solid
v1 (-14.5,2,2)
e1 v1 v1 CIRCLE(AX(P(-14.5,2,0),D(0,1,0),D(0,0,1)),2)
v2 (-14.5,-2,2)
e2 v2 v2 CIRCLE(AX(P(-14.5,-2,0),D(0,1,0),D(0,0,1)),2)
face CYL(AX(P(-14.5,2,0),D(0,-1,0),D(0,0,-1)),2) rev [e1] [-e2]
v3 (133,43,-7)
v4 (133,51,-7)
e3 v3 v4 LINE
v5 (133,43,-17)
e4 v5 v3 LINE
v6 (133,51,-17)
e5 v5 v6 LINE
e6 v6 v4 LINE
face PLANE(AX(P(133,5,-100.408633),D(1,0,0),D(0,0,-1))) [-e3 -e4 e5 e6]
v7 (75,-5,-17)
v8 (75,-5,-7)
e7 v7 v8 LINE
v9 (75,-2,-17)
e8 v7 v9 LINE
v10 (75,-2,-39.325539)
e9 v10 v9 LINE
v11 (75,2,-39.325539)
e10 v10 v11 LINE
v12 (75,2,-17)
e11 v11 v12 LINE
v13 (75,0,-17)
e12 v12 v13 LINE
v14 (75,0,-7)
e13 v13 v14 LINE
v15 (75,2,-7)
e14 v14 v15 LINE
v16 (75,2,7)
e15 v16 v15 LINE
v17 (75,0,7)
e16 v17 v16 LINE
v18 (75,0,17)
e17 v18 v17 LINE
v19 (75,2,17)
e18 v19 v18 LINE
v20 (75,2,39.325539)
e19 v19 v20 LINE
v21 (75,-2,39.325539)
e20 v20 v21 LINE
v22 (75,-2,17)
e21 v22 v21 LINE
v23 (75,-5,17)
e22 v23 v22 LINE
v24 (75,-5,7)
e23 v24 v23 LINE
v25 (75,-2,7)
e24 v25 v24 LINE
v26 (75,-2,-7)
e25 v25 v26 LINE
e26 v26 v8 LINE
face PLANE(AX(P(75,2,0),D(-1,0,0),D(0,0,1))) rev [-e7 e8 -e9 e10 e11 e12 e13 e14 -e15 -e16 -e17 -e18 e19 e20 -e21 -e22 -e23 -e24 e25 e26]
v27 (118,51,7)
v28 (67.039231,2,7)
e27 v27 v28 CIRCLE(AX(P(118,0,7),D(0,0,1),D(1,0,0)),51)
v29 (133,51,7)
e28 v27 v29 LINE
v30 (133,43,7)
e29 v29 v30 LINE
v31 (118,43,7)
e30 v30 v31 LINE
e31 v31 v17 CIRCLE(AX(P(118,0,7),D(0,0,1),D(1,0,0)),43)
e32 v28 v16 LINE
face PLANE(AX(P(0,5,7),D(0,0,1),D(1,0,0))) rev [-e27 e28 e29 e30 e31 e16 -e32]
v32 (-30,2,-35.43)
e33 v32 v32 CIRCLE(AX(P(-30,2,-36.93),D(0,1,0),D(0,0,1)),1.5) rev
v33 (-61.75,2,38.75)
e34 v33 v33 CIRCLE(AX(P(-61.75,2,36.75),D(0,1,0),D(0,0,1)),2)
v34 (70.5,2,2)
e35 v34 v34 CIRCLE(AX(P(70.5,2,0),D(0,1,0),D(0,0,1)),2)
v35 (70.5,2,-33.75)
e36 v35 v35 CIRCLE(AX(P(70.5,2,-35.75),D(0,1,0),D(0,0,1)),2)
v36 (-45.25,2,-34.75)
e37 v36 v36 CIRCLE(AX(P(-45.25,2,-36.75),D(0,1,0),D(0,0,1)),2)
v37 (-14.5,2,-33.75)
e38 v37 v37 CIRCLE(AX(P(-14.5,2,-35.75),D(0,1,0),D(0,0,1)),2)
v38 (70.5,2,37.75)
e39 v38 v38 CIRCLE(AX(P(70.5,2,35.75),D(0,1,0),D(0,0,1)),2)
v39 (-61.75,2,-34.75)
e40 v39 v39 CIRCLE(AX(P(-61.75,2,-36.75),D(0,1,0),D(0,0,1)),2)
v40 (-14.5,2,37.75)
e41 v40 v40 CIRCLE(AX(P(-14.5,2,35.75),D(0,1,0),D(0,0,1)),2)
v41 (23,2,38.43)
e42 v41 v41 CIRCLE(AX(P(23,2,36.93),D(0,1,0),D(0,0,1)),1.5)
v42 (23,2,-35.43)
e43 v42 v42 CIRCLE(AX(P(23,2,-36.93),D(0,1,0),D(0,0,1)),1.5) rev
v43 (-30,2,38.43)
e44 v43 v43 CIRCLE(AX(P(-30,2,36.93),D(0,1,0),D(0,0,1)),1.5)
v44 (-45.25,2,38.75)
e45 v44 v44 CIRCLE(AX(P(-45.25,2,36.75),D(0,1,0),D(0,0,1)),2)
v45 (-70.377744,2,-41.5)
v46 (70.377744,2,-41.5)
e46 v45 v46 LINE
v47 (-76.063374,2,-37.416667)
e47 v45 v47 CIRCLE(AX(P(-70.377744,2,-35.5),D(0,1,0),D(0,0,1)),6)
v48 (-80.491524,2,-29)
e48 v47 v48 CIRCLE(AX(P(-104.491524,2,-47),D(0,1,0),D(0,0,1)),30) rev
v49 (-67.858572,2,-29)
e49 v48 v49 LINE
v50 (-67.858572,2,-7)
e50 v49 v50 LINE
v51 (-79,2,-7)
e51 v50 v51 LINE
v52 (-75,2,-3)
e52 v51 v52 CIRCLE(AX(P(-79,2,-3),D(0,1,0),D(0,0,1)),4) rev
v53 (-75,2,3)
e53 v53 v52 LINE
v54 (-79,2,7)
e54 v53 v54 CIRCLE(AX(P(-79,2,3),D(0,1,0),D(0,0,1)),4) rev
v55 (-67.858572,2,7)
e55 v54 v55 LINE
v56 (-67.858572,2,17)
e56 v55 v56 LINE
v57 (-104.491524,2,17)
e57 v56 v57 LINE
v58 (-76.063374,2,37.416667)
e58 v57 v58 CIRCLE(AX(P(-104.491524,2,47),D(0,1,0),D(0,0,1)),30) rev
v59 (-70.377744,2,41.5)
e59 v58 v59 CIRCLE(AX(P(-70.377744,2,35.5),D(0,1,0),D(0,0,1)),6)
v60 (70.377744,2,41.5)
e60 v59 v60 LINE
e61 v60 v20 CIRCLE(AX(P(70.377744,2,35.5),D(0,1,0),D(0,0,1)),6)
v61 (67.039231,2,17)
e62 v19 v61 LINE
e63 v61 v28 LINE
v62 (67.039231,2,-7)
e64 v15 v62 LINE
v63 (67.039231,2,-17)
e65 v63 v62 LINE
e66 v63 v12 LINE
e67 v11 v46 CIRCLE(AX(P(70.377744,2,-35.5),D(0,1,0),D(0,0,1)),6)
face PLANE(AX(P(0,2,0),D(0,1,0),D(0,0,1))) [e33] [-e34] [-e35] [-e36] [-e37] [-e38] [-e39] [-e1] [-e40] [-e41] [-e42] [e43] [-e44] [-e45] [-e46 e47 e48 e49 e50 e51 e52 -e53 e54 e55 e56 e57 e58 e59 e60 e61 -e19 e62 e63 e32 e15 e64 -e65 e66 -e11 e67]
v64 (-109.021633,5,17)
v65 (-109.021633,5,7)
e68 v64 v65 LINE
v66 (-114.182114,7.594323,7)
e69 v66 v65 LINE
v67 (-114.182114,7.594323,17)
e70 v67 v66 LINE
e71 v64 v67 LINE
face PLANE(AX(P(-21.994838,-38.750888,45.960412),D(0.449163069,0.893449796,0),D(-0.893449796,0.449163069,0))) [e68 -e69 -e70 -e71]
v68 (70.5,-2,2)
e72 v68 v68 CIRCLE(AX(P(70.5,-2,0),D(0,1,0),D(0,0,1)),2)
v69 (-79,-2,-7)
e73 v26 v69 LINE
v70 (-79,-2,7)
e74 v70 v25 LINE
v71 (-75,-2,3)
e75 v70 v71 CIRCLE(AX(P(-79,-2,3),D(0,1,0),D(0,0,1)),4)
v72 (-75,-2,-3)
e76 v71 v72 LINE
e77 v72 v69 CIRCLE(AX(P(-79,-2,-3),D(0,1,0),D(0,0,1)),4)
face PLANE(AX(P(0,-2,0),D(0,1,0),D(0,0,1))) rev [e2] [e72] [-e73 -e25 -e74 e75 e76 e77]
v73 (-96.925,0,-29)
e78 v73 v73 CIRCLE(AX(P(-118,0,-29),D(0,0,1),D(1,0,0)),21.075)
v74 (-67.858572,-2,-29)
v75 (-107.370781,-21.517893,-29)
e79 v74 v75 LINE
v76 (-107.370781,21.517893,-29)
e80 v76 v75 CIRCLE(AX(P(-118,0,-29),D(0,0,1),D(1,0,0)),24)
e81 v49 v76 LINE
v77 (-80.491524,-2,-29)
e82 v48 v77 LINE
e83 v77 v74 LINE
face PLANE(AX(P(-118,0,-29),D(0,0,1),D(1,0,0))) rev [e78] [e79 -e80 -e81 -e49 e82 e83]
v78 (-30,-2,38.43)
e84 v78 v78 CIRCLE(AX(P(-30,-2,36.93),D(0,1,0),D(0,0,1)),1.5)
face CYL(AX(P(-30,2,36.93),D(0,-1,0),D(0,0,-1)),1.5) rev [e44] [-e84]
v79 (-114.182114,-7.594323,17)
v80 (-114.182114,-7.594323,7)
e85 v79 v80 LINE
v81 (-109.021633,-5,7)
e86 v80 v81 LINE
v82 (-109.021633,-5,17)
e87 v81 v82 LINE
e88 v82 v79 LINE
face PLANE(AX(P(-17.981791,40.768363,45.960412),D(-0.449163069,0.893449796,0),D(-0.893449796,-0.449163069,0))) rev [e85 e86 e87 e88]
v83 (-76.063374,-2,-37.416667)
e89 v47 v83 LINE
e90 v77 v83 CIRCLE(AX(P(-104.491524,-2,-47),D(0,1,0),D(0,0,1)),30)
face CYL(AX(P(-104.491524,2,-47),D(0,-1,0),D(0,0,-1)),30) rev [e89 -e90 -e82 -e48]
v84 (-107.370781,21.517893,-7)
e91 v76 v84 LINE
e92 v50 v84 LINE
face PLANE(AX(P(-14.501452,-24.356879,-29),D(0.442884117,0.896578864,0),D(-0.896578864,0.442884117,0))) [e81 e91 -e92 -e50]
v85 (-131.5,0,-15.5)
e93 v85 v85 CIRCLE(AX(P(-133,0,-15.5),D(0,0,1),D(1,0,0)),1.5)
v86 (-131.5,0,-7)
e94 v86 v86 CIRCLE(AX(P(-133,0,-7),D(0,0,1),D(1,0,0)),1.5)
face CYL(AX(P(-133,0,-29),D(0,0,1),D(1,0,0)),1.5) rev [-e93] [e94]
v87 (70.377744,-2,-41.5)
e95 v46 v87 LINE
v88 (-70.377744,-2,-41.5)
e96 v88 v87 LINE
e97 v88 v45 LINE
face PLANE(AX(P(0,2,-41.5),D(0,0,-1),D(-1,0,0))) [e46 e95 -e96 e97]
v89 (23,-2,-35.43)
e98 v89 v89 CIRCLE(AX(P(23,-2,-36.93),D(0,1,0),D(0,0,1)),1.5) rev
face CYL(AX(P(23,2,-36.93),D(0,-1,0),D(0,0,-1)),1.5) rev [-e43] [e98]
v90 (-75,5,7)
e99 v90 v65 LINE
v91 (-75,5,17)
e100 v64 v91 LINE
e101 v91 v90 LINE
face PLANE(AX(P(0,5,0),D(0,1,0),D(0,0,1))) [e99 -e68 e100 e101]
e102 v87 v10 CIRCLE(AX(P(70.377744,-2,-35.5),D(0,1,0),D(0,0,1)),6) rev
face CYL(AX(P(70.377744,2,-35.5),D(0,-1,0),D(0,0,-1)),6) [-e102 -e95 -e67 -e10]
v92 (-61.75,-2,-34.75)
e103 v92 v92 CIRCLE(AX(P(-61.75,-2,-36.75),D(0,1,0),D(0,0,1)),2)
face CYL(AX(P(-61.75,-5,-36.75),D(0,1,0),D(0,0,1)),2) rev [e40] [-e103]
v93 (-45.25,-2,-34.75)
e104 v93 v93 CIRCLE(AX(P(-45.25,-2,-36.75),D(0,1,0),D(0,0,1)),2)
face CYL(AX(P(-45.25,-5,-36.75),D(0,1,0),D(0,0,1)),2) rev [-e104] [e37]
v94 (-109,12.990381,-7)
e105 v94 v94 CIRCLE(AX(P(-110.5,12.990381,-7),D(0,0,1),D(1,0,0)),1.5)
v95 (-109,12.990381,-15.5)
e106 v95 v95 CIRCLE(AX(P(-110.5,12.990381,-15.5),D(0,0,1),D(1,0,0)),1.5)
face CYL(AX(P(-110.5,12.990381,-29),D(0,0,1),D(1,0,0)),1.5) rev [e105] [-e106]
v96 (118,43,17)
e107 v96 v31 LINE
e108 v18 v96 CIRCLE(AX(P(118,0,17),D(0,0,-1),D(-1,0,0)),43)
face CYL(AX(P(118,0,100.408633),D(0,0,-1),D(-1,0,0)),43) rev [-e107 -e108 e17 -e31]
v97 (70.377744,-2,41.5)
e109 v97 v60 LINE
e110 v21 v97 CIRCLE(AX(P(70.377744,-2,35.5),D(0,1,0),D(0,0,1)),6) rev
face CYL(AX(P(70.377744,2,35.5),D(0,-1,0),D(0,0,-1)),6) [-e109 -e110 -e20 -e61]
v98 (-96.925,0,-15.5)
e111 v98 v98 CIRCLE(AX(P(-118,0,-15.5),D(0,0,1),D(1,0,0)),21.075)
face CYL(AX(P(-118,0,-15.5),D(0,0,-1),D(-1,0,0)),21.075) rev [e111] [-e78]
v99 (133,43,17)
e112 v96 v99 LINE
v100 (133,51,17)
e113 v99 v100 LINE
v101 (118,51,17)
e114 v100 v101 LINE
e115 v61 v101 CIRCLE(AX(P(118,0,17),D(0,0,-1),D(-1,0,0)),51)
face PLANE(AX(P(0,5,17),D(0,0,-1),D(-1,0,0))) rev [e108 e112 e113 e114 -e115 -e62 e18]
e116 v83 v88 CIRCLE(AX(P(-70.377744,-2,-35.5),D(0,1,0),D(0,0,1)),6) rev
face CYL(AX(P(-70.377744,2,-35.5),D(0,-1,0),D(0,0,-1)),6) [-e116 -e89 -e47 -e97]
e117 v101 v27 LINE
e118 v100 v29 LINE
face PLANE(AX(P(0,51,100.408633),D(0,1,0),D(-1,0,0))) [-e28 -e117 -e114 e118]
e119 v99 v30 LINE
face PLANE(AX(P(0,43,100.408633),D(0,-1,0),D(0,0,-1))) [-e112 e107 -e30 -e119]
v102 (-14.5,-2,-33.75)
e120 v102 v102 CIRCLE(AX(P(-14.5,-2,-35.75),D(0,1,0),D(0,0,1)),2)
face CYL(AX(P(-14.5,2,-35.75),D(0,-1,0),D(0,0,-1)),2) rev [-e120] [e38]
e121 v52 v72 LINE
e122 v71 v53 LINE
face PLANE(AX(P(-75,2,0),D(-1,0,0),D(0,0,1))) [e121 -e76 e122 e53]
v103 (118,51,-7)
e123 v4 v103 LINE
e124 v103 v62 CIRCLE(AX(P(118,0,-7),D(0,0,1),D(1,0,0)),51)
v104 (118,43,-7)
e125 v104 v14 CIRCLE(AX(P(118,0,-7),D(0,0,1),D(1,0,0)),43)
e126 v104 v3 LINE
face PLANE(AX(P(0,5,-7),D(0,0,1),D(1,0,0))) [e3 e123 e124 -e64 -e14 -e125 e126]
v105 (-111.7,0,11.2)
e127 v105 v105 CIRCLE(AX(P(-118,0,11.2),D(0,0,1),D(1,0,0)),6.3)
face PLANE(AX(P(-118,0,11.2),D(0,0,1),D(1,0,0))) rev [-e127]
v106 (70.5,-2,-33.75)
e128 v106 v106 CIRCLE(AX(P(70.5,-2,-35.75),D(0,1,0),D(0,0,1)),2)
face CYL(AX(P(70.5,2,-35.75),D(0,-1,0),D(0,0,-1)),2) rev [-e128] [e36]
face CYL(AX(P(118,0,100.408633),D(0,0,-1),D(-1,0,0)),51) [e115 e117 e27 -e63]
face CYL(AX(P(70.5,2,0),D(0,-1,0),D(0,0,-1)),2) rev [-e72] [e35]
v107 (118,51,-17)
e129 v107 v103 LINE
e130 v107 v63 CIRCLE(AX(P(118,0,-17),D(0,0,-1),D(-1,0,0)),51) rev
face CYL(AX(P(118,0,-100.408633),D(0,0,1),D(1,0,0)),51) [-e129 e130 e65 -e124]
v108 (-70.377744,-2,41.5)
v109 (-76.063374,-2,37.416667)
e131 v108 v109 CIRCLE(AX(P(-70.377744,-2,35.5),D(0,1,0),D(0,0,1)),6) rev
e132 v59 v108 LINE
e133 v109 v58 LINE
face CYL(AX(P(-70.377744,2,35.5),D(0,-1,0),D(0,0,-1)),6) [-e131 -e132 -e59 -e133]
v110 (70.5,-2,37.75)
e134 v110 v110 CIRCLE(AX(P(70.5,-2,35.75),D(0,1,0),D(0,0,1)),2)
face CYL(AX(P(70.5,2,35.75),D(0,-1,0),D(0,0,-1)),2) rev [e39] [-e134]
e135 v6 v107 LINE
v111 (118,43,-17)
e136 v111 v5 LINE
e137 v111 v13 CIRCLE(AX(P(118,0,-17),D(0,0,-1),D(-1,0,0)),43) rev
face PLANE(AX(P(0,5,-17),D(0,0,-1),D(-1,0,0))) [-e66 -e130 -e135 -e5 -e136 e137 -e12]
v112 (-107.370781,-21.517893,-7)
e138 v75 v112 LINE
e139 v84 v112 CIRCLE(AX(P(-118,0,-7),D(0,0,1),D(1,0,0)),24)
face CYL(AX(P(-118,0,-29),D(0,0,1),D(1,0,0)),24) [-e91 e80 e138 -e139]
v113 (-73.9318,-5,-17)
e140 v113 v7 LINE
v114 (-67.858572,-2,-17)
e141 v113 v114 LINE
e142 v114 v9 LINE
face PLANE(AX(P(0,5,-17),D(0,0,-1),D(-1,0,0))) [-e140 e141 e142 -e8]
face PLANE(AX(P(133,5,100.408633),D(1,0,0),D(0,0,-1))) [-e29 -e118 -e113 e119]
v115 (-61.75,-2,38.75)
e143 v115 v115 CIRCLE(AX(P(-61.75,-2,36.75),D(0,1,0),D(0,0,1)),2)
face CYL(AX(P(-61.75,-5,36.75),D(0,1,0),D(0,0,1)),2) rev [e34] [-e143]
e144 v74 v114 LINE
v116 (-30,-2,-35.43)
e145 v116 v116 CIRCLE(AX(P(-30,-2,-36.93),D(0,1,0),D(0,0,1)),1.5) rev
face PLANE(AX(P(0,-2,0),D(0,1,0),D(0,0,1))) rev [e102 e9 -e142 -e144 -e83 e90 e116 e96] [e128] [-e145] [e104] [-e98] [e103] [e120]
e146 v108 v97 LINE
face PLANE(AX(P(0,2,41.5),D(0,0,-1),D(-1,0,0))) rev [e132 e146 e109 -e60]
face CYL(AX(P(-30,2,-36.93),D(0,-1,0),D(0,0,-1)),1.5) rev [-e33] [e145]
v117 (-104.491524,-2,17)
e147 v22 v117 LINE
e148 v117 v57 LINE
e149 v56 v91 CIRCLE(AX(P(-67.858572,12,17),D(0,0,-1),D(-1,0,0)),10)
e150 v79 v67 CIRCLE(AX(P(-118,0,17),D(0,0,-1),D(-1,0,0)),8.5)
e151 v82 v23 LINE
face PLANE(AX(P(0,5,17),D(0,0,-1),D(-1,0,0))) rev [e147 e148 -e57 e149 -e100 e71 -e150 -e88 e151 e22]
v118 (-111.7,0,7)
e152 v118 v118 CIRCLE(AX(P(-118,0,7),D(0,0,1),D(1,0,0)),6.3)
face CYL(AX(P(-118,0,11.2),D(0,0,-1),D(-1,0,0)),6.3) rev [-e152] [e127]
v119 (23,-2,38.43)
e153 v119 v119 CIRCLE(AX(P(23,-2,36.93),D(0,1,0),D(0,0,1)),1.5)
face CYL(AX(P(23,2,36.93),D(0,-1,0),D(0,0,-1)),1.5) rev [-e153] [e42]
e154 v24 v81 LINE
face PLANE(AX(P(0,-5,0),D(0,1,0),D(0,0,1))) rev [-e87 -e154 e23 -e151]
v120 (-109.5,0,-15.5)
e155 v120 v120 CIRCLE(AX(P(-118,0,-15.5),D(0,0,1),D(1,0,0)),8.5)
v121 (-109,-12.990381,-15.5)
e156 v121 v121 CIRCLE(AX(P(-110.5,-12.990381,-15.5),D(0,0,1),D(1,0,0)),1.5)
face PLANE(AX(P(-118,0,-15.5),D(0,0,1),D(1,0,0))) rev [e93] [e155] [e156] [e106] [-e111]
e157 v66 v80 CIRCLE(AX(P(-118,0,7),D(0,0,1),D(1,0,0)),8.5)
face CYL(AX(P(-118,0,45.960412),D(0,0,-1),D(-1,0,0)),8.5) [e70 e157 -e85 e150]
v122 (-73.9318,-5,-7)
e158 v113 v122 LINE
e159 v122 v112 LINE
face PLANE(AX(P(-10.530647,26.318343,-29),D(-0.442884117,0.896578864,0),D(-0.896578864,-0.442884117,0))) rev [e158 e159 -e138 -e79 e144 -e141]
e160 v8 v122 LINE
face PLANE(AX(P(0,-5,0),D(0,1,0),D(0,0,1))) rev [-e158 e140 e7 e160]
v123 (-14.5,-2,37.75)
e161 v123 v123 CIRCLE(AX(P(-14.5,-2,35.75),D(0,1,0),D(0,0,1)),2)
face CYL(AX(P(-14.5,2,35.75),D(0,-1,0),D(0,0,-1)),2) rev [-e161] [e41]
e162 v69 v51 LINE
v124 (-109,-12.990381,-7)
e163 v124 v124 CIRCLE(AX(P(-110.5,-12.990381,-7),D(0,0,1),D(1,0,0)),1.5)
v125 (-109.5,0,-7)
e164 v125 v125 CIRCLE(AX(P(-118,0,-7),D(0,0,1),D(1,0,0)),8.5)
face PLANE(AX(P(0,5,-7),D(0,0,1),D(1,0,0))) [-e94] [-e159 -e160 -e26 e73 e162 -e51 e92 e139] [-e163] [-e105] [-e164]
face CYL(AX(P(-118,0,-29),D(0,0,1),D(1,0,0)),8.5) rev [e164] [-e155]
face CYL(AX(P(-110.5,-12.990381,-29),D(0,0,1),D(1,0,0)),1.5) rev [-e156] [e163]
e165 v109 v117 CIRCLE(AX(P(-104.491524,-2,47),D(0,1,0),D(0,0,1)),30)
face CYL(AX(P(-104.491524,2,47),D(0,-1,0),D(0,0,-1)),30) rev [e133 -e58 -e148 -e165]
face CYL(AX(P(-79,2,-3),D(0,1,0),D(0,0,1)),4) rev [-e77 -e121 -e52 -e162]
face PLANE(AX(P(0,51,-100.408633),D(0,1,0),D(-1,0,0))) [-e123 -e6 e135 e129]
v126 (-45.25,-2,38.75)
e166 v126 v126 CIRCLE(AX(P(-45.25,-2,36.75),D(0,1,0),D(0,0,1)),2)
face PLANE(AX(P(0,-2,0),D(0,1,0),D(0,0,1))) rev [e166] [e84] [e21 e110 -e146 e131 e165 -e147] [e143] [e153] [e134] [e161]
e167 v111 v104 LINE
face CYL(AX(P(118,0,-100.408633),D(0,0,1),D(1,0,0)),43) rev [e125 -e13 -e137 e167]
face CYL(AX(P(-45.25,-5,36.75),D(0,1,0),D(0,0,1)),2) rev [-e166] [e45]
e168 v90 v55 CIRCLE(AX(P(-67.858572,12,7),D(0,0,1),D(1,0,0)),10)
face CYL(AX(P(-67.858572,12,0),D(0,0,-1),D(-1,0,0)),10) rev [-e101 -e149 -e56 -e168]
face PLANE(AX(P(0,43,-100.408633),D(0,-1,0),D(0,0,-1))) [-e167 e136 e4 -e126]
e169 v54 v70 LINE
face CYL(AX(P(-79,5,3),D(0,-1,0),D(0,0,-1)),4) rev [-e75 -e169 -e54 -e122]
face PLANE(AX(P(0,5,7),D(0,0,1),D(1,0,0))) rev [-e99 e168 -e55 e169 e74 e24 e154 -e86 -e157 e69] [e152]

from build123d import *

# Parameters (mm, degrees)
SKETCH1_W                = 49
SKETCH1_H                = 10
BOSS_EXTRUDE1_DEPTH      = 5
BOSS_EXTRUDE1_2_DEPTH    = 5
BOSS_EXTRUDE1_3_DEPTH    = 5
BOSS_EXTRUDE1_4_DEPTH    = 5
CUT_EXTRUDE7_DEPTH       = 129.674006699
CUT_EXTRUDE7_DEPTH_BACK  = 129.674006699
SKETCH2_R                = 2
SKETCH1_3_W              = 150
SKETCH1_3_H              = 83
SKETCH1_3_R              = 2
SKETCH1_3_R_2            = 1.5
BOSS_EXTRUDE2_DEPTH      = 2
FILLET1_R                = 10
SKETCH3_W                = 150
SKETCH3_H                = 10
BOSS_EXTRUDE3_DEPTH      = 3
FILLET2_R                = 30
FILLET3_R                = 4
FILLET4_R                = 6
CUT_EXTRUDE8_DEPTH       = 131.000961535
CUT_EXTRUDE8_DEPTH_BACK  = 131.000961535
SKETCH4_R                = 2
CUT_EXTRUDE11_DEPTH      = 10
CUT_EXTRUDE11_DEPTH_BACK = 10
SKETCH7_W                = 28.430899549
SKETCH7_H                = 10.310755735
BOSS_EXTRUDE4_START      = -10
SKETCH6_R                = 21.075
SKETCH6_R_2              = 1.5
SKETCH6_R_3              = 8.5
BOSS_EXTRUDE4_DEPTH      = 22
SKETCH9_R                = 2
BOSS_EXTRUDE5_DEPTH      = 10
CUT_EXTRUDE12_START      = -10
SKETCH9_4_R              = 2
CUT_EXTRUDE12_DEPTH      = 4.2
CUT_EXTRUDE13_START      = -1.5
SKETCH6_3_R              = 21.075
SKETCH6_3_R_2            = 1.5
SKETCH6_3_R_3            = 8.5
CUT_EXTRUDE13_DEPTH      = 13.5
CUT_EXTRUDE14_DEPTH      = 151.207356677
CUT_EXTRUDE14_DEPTH_BACK = 151.207356677
SKETCH11_W               = 48
SKETCH11_H               = 83
BOSS_EXTRUDE6_START      = 7
BOSS_EXTRUDE6_DEPTH      = 10
BOSS_EXTRUDE7_START      = -17
BOSS_EXTRUDE7_DEPTH      = 10


with BuildPart() as part:
    # Sketch1 → Boss-Extrude1 (new, symmetric)
    with BuildSketch(Plane(origin=(0, 0, 0), x_dir=(1, 0, 0), z_dir=(0, 1, 0))):
        with Locations((-99.5, 12)):
            Rectangle(SKETCH1_W, SKETCH1_H)
    extrude(amount=BOSS_EXTRUDE1_DEPTH, both=True)


with BuildPart() as body_2:
    # Sketch1 → Boss-Extrude1 2 (new, symmetric)
    with BuildSketch(Plane(origin=(0, 0, 0), x_dir=(1, 0, 0), z_dir=(0, 1, 0))):
        with Locations((-99.5, -12)):
            Rectangle(SKETCH1_W, SKETCH1_H)
    extrude(amount=BOSS_EXTRUDE1_2_DEPTH, both=True)


with BuildPart() as body_3:
    # Sketch1 → Boss-Extrude1 3 (new, symmetric)
    with BuildSketch(Plane(origin=(0, 0, 0), x_dir=(1, 0, 0), z_dir=(0, 1, 0))):
        with Locations((99.5, 12)):
            Rectangle(SKETCH1_W, SKETCH1_H)
    extrude(amount=BOSS_EXTRUDE1_3_DEPTH, both=True)


with BuildPart() as body_4:
    # Sketch1 → Boss-Extrude1 4 (new, symmetric)
    with BuildSketch(Plane(origin=(0, 0, 0), x_dir=(1, 0, 0), z_dir=(0, 1, 0))):
        with Locations((99.5, -12)):
            Rectangle(SKETCH1_W, SKETCH1_H)
    extrude(amount=BOSS_EXTRUDE1_4_DEPTH, both=True)


with BuildPart() as cut_extrude7_tool:
    # Sketch2 → Cut-Extrude7 (new, two sides: drawn at the far end of the back side and taken through both)
    with BuildSketch(Plane(origin=(0, 0, -17), x_dir=(-1, 0, 0), z_dir=(0, 0, -1)).offset(-CUT_EXTRUDE7_DEPTH_BACK)):
        with Locations((-118, 0)):
            Circle(SKETCH2_R)
        with Locations((118, 0)):
            Circle(SKETCH2_R)
        with BuildLine():
            Line((-118, 5), (-118, 9.505708739))
            Line((-118, 9.505708739), (-152.726369059, 9.505708739))
            Line((-152.726369059, 9.505708739), (-152.726369059, -6.904283851))
            Line((-152.726369059, -6.904283851), (-118, -6.904283851))
            Line((-118, -6.904283851), (-118, -5))
            ThreePointArc((-118, -5), (-123, 0), (-118, 5))
        make_face()
        with BuildLine():
            Line((118, 5), (118, 9.505708739))
            Line((118, 9.505708739), (152.726369059, 9.505708739))
            Line((152.726369059, 9.505708739), (152.726369059, -6.904283851))
            Line((152.726369059, -6.904283851), (118, -6.904283851))
            Line((118, -6.904283851), (118, -5))
            ThreePointArc((118, -5), (123, 0), (118, 5))
        make_face()
    extrude(amount=CUT_EXTRUDE7_DEPTH + CUT_EXTRUDE7_DEPTH_BACK)


with BuildPart() as part_1:
    add(part.part)

    # Cut-Extrude7: cut by cut_extrude7_tool
    add(cut_extrude7_tool.part, mode=Mode.SUBTRACT)



with BuildPart() as body_2_1:
    add(body_2.part)

    # Cut-Extrude7: cut by cut_extrude7_tool
    add(cut_extrude7_tool.part, mode=Mode.SUBTRACT)


with BuildPart() as body_3_1:
    add(body_3.part)

    # Cut-Extrude7: cut by cut_extrude7_tool
    add(cut_extrude7_tool.part, mode=Mode.SUBTRACT)


with BuildPart() as body_4_1:
    add(body_4.part)

    # Cut-Extrude7: cut by cut_extrude7_tool
    add(cut_extrude7_tool.part, mode=Mode.SUBTRACT)


with BuildPart() as part_2:
    add(part_1.part)

    add(body_2_1.part)  # Boss-Extrude2 merges body 2

    add(body_3_1.part)  # Boss-Extrude2 merges body 3

    add(body_4_1.part)  # Boss-Extrude2 merges body 4
    # Sketch1<3> → Boss-Extrude2 (add, symmetric)
    with BuildSketch(Plane(origin=(0, 0, 0), x_dir=(1, 0, 0), z_dir=(0, 1, 0))):
        Rectangle(SKETCH1_3_W, SKETCH1_3_H)
        with Locations(Location((70.5, 35.75, 0), (0, 0, 270))):
            Circle(SKETCH1_3_R, mode=Mode.SUBTRACT)
        with Locations(Location((70.5, 0, 0), (0, 0, 270))):
            Circle(SKETCH1_3_R, mode=Mode.SUBTRACT)
        with Locations(Location((70.5, -35.75, 0), (0, 0, 270))):
            Circle(SKETCH1_3_R, mode=Mode.SUBTRACT)
        with Locations(Location((-14.5, -35.75, 0), (0, 0, 270))):
            Circle(SKETCH1_3_R, mode=Mode.SUBTRACT)
        with Locations(Location((-14.5, 0, 0), (0, 0, 270))):
            Circle(SKETCH1_3_R, mode=Mode.SUBTRACT)
        with Locations(Location((-14.5, 35.75, 0), (0, 0, 270))):
            Circle(SKETCH1_3_R, mode=Mode.SUBTRACT)
        with Locations(Location((-30, -36.93, 0), (0, 0, 270))):
            Circle(SKETCH1_3_R_2, mode=Mode.SUBTRACT)
        with Locations(Location((23, -36.93, 0), (0, 0, 270))):
            Circle(SKETCH1_3_R_2, mode=Mode.SUBTRACT)
        with Locations(Location((23, 36.93, 0), (0, 0, 270))):
            Circle(SKETCH1_3_R_2, mode=Mode.SUBTRACT)
        with Locations(Location((-30, 36.93, 0), (0, 0, 270))):
            Circle(SKETCH1_3_R_2, mode=Mode.SUBTRACT)
    extrude(amount=BOSS_EXTRUDE2_DEPTH, both=True)

    # Fillet1
    # the kernel refuses this fillet: 10 mm, written as the material it adds along each edge
    with BuildSketch(Plane(origin=(-75, 2, -17), x_dir=(0, 1, 0), z_dir=(0, 0, 1))) as fillet1_piece_1:
        with BuildLine():
            CenterArc((10, -7.141428429), FILLET1_R, 134.427004001, 45.572995999)
            Line((0, -7.141428429), (0, 0))
            Line((0, 0), (3, 0))
        make_face()
    extrude(amount=10)
    with BuildSketch(Plane(origin=(-75, 2, -34.853571071), x_dir=(0, 1, 0), z_dir=(0, 0, 1))) as fillet1_piece_2_section:
        with BuildLine():
            CenterArc((10, -7.141428429), FILLET1_R, 134.427004001, 45.572995999)
            Line((0, -7.141428429), (0, 0))
            Line((0, 0), (3, 0))
        make_face()
    fillet1_piece_2 = extrude(amount=45.707142143, mode=Mode.PRIVATE)
    fillet1_piece_2 = split(fillet1_piece_2, bisect_by=Plane(origin=(-71.739300884, 2.762016454, 7), z_dir=(0, 0, 1)), keep=Keep.TOP, mode=Mode.PRIVATE)
    add(fillet1_piece_2)
    with BuildSketch(Plane(origin=(-75, 2, -10.853571071), x_dir=(1, 0, 0), z_dir=(0, 0, 1))) as fillet1_piece_3_section:
        with BuildLine():
            CenterArc((7.141428429, 10), FILLET1_R, 224.427004001, 45.572995999)
            Line((0, 3), (0, 0))
            Line((0, 0), (7.141428429, 0))
        make_face()
    fillet1_piece_3 = extrude(amount=45.707142143, mode=Mode.PRIVATE)
    fillet1_piece_3 = split(fillet1_piece_3, bisect_by=Plane(origin=(-71.739300884, 2.762016454, -7), z_dir=(0, 0, -1)), keep=Keep.TOP, mode=Mode.PRIVATE)
    add(fillet1_piece_3)
    with BuildSketch(Plane(origin=(-75, 2, 7), x_dir=(1, 0, 0), z_dir=(0, 0, 1)), Plane(origin=(75, 2, 17), x_dir=(-1, 0, 0), z_dir=(0, 0, -1)), Plane(origin=(75, 2, -7), x_dir=(-1, 0, 0), z_dir=(0, 0, -1))) as fillet1_piece_4:
        with BuildLine():
            CenterArc((7.141428429, 10), FILLET1_R, 224.427004001, 45.572995999)
            Line((0, 3), (0, 0))
            Line((0, 0), (7.141428429, 0))
        make_face()
    extrude(amount=10)
    with BuildSketch(Plane(origin=(75, 2, 34.853571071), x_dir=(-1, 0, 0), z_dir=(0, 0, -1))) as fillet1_piece_5_section:
        with BuildLine():
            CenterArc((7.141428429, 10), FILLET1_R, 224.427004001, 45.572995999)
            Line((0, 3), (0, 0))
            Line((0, 0), (7.141428429, 0))
        make_face()
    fillet1_piece_5 = extrude(amount=45.707142143, mode=Mode.PRIVATE)
    fillet1_piece_5 = split(fillet1_piece_5, bisect_by=Plane(origin=(71.739300884, 2.762016454, -7), z_dir=(0, 0, -1)), keep=Keep.TOP, mode=Mode.PRIVATE)
    add(fillet1_piece_5)
    with BuildSketch(Plane(origin=(75, 2, 10.853571071), x_dir=(-1, 0, 0), z_dir=(0, 0, -1))) as fillet1_piece_6_section:
        with BuildLine():
            CenterArc((7.141428429, 10), FILLET1_R, 224.427004001, 45.572995999)
            Line((0, 3), (0, 0))
            Line((0, 0), (7.141428429, 0))
        make_face()
    fillet1_piece_6 = extrude(amount=45.707142143, mode=Mode.PRIVATE)
    fillet1_piece_6 = split(fillet1_piece_6, bisect_by=Plane(origin=(71.739300884, 2.762016454, 7), z_dir=(0, 0, 1)), keep=Keep.TOP, mode=Mode.PRIVATE)
    add(fillet1_piece_6)

    # Sketch3 → Boss-Extrude3 (add)
    with BuildSketch(Plane.XZ.offset(2)):
        with Locations((0, 12)):
            Rectangle(SKETCH3_W, SKETCH3_H)
        with Locations((0, -12)):
            Rectangle(SKETCH3_W, SKETCH3_H)
    extrude(amount=BOSS_EXTRUDE3_DEPTH)

    # Fillet2
    # the kernel refuses this fillet: 30 mm, written as the material it adds along each edge
    with BuildSketch(Plane(origin=(-75, 2, 17), x_dir=(-1, 0, 0), z_dir=(0, -1, 0)), Plane(origin=(75, -2, 17), x_dir=(1, 0, 0), z_dir=(0, 1, 0))) as fillet2_piece_1:
        with BuildLine():
            CenterArc((29.491524206, -30), FILLET2_R, 90, 79.436022411)
            Line((0, -24.5), (-0.589830484, -24.39))
            ThreePointArc((-0.589830484, -24.39), (-0.6, -12.25), (-0.6, 0))
            Line((-0.6, 0), (0, 0.6))
            Line((0, 0.6), (29.491524206, 0.6))
            Line((29.491524206, 0.6), (29.491524206, 0))
        make_face()
    extrude(amount=4)
    with BuildSketch(Plane(origin=(-75, -2, -17), x_dir=(0, 0, -1), z_dir=(0, 1, 0)), Plane(origin=(75, 2, -17), x_dir=(0, 0, -1), z_dir=(0, -1, 0))) as fillet2_piece_2:
        with BuildLine():
            CenterArc((30, 29.491524206), FILLET2_R, 180, 79.436022411)
            Line((0, 29.491524206), (-0.6, 29.491524206))
            Line((-0.6, 29.491524206), (-0.6, 0))
            Line((-0.6, 0), (0, -0.6))
            ThreePointArc((0, -0.6), (12.25, -0.6), (24.39, -0.589830484))
            Line((24.39, -0.589830484), (24.5, 0))
        make_face()
    extrude(amount=4)

    # Fillet3
    fillet3_edges = [part_2.edges().sort_by_distance(p)[0] for p in [
        (-75, 0, 7),
        (75, 0, -7),
        (75, 0, 7),
        (-75, 0, -7),
    ]]
    fillet(fillet3_edges, radius=FILLET3_R)

    # Fillet4
    fillet4_edges = [part_2.edges().sort_by_distance(p)[0] for p in [
        (-75, 0, -41.5),
        (-75, 0, 41.5),
        (75, 0, 41.5),
        (75, 0, -41.5),
    ]]
    fillet(fillet4_edges, radius=FILLET4_R)

    # Sketch4 → Cut-Extrude8 (cut, two sides: drawn at the far end of the back side and taken through both)
    with BuildSketch(Plane(origin=(0, 2, 0), x_dir=(1, 0, 0), z_dir=(0, 1, 0)).offset(-CUT_EXTRUDE8_DEPTH_BACK)):
        with Locations(Location((-45.25, -36.75, 0), (0, 0, 270))):
            Circle(SKETCH4_R)
        with Locations(Location((-61.75, -36.75, 0), (0, 0, 270))):
            Circle(SKETCH4_R)
        with Locations(Location((-45.25, 36.75, 0), (0, 0, 270))):
            Circle(SKETCH4_R)
        with Locations(Location((-61.75, 36.75, 0), (0, 0, 270))):
            Circle(SKETCH4_R)
    extrude(amount=CUT_EXTRUDE8_DEPTH + CUT_EXTRUDE8_DEPTH_BACK, mode=Mode.SUBTRACT)

    # Sketch7 → Cut-Extrude11 (cut, two sides: drawn at the far end of the back side and taken through both)
    with BuildSketch(Plane(origin=(0, 0, -17), x_dir=(-1, 0, 0), z_dir=(0, 0, -1)).offset(-CUT_EXTRUDE11_DEPTH_BACK)):
        with Locations((109.035286033, -0.155377868)):
            Rectangle(SKETCH7_W, SKETCH7_H)
    extrude(amount=CUT_EXTRUDE11_DEPTH + CUT_EXTRUDE11_DEPTH_BACK, mode=Mode.SUBTRACT)

    # Sketch6 → Boss-Extrude4 (add)
    # profile 1 of 6: a face of its own
    with BuildSketch(Plane(origin=(0, 0, -17), x_dir=(-1, 0, 0), z_dir=(0, 0, -1)).offset(BOSS_EXTRUDE4_START)):
        with BuildLine():
            ThreePointArc((142, 0), (130.666861261, 20.385058886), (107.370781183, 21.517892726))
            ThreePointArc((107.370781183, 21.517892726), (97.104429588, 11.805724763), (94.083478514, -2))
            Line((94.083478514, -2), (94.819836258, -2))
            Line((94.819836258, -2), (94.819836258, -5))
            Line((94.819836258, -5), (94.526610811, -5))
            ThreePointArc((94.526610811, -5), (99.053835132, -14.732373766), (107.370781183, -21.517892726))
            ThreePointArc((107.370781183, -21.517892726), (130.666861261, -20.385058886), (142, 0))
        make_face()
        with Locations((118, 0)):
            Circle(SKETCH6_R, mode=Mode.SUBTRACT)
    # profile 2 of 6: a face of its own
    with BuildSketch(Plane(origin=(0, 0, -17), x_dir=(-1, 0, 0), z_dir=(0, 0, -1)).offset(BOSS_EXTRUDE4_START)):
        with Locations((118, 0)):
            Circle(SKETCH6_R)
        with Locations(Location((110.5, -12.990381057, 0), (0, 0, 180))):
            Circle(SKETCH6_R_2, mode=Mode.SUBTRACT)
        with Locations(Location((110.5, 12.990381057, 0), (0, 0, 180))):
            Circle(SKETCH6_R_2, mode=Mode.SUBTRACT)
        with Locations(Location((133, 0, 0), (0, 0, 180))):
            Circle(SKETCH6_R_2, mode=Mode.SUBTRACT)
        with Locations(Location((118, 0, 0), (0, 0, 180))):
            Circle(SKETCH6_R_3, mode=Mode.SUBTRACT)
    # profile 3 of 6: a face of its own
    with BuildSketch(Plane(origin=(0, 0, -17), x_dir=(-1, 0, 0), z_dir=(0, 0, -1)).offset(BOSS_EXTRUDE4_START)):
        with BuildLine():
            Line((73.931800403, -5), (107.370781183, -21.517892726))
            ThreePointArc((107.370781183, -21.517892726), (99.053835132, -14.732373766), (94.526610811, -5))
            Line((94.526610811, -5), (73.931800403, -5))
        make_face()
    # profile 4 of 6: a face of its own
    with BuildSketch(Plane(origin=(0, 0, -17), x_dir=(-1, 0, 0), z_dir=(0, 0, -1)).offset(BOSS_EXTRUDE4_START)):
        with BuildLine():
            ThreePointArc((94.083478514, -2), (97.104429588, 11.805724763), (107.370781183, 21.517892726))
            Line((107.370781183, 21.517892726), (67.858571571, 2))
            Line((67.858571571, 2), (67.858571571, -2))
            Line((67.858571571, -2), (94.083478514, -2))
        make_face()
    # profile 5 of 6: a face of its own
    with BuildSketch(Plane(origin=(0, 0, -17), x_dir=(-1, 0, 0), z_dir=(0, 0, -1)).offset(BOSS_EXTRUDE4_START)):
        with BuildLine():
            ThreePointArc((94.526610811, -5), (94.257613674, -3.507006068), (94.083478514, -2))
            Line((94.083478514, -2), (67.858571571, -2))
            Line((67.858571571, -2), (73.931800403, -5))
            Line((73.931800403, -5), (94.526610811, -5))
        make_face()
    # profile 6 of 6: a face of its own
    with BuildSketch(Plane(origin=(0, 0, -17), x_dir=(-1, 0, 0), z_dir=(0, 0, -1)).offset(BOSS_EXTRUDE4_START)):
        with BuildLine():
            Line((94.819836258, -2), (94.083478514, -2))
            ThreePointArc((94.083478514, -2), (94.257613674, -3.507006068), (94.526610811, -5))
            Line((94.526610811, -5), (94.819836258, -5))
            Line((94.819836258, -5), (94.819836258, -2))
        make_face()
    extrude(amount=BOSS_EXTRUDE4_DEPTH)

    # Sketch9 → Boss-Extrude5 (add)
    # profile 1 of 10: a face of its own
    with BuildSketch(Plane.XY.offset(17)):
        with BuildLine():
            Line((-103.054202201, 2), (-109.021632678, 5))
            Line((-109.021632678, 5), (-111.126136458, 5))
            ThreePointArc((-111.126136458, 5), (-109.91675065, 2.628893293), (-109.5, 0))
            ThreePointArc((-109.5, 0), (-109.91675065, -2.628893293), (-111.126136458, -5))
            Line((-111.126136458, -5), (-109.021632678, -5))
            Line((-109.021632678, -5), (-103.054202201, -2))
            Line((-103.054202201, -2), (-104.491524206, -2))
            Line((-104.491524206, -2), (-104.491524206, 2))
            Line((-104.491524206, 2), (-103.054202201, 2))
        make_face()
    # profile 2 of 10: a face of its own
    with BuildSketch(Plane.XY.offset(17)):
        with BuildLine():
            ThreePointArc((-111.126136458, 5), (-112.498999561, 6.479891524), (-114.182113913, 7.594323263))
            ThreePointArc((-114.182113913, 7.594323263), (-126.5, 0), (-114.182113913, -7.594323263))
            ThreePointArc((-114.182113913, -7.594323263), (-112.498999561, -6.479891524), (-111.126136458, -5))
            Line((-111.126136458, -5), (-114.167246421, -5))
            ThreePointArc((-114.167246421, -5), (-124.3, 0), (-114.167246421, 5))
            Line((-114.167246421, 5), (-111.126136458, 5))
        make_face()
    # profile 3 of 10: a face of its own
    with BuildSketch(Plane.XY.offset(17)):
        with BuildLine():
            ThreePointArc((-109.5, 0), (-109.91675065, 2.628893293), (-111.126136458, 5))
            Line((-111.126136458, 5), (-114.167246421, 5))
            ThreePointArc((-114.167246421, 5), (-112.350382865, 2.787799531), (-111.7, 0))
            ThreePointArc((-111.7, 0), (-112.350382865, -2.787799531), (-114.167246421, -5))
            Line((-114.167246421, -5), (-111.126136458, -5))
            ThreePointArc((-111.126136458, -5), (-109.91675065, -2.628893293), (-109.5, 0))
        make_face()
    # profile 4 of 10: a face of its own
    with BuildSketch(Plane.XY.offset(17)):
        with BuildLine():
            ThreePointArc((-111.7, 0), (-112.350382865, 2.787799531), (-114.167246421, 5))
            Line((-114.167246421, 5), (-118, 5))
            ThreePointArc((-118, 5), (-123, 0), (-118, -5))
            Line((-118, -5), (-114.167246421, -5))
            ThreePointArc((-114.167246421, -5), (-112.350382865, -2.787799531), (-111.7, 0))
        make_face()
        with Locations((-118, 0)):
            Circle(SKETCH9_R, mode=Mode.SUBTRACT)
    # profile 5 of 10: a face of its own
    with BuildSketch(Plane.XY.offset(17)):
        with BuildLine():
            Line((-118, 5), (-114.167246421, 5))
            ThreePointArc((-114.167246421, 5), (-124.3, 0), (-114.167246421, -5))
            Line((-114.167246421, -5), (-118, -5))
            ThreePointArc((-118, -5), (-123, 0), (-118, 5))
        make_face()
    # profile 6 of 10: a face of its own
    with BuildSketch(Plane.XY.offset(17)):
        with BuildLine():
            ThreePointArc((-111.126136458, 5), (-112.498999561, 6.479891524), (-114.182113913, 7.594323263))
            ThreePointArc((-114.182113913, 7.594323263), (-126.5, 0), (-114.182113913, -7.594323263))
            ThreePointArc((-114.182113913, -7.594323263), (-112.498999561, -6.479891524), (-111.126136458, -5))
            Line((-111.126136458, -5), (-114.167246421, -5))
            ThreePointArc((-114.167246421, -5), (-124.3, 0), (-114.167246421, 5))
            Line((-114.167246421, 5), (-111.126136458, 5))
        make_face()
    # profile 7 of 10: a face of its own
    with BuildSketch(Plane.XY.offset(17)):
        with BuildLine():
            ThreePointArc((-109.5, 0), (-109.91675065, 2.628893293), (-111.126136458, 5))
            Line((-111.126136458, 5), (-114.167246421, 5))
            ThreePointArc((-114.167246421, 5), (-112.350382865, 2.787799531), (-111.7, 0))
            ThreePointArc((-111.7, 0), (-112.350382865, -2.787799531), (-114.167246421, -5))
            Line((-114.167246421, -5), (-111.126136458, -5))
            ThreePointArc((-111.126136458, -5), (-109.91675065, -2.628893293), (-109.5, 0))
        make_face()
    # profile 8 of 10: a face of its own
    with BuildSketch(Plane.XY.offset(17)):
        with BuildLine():
            Line((-109.021632678, 5), (-114.182113913, 7.594323263))
            ThreePointArc((-114.182113913, 7.594323263), (-112.498999561, 6.479891524), (-111.126136458, 5))
            Line((-111.126136458, 5), (-109.021632678, 5))
        make_face()
    # profile 9 of 10: a face of its own
    with BuildSketch(Plane.XY.offset(17)):
        with BuildLine():
            ThreePointArc((-111.126136458, -5), (-112.498999561, -6.479891524), (-114.182113913, -7.594323263))
            Line((-114.182113913, -7.594323263), (-109.021632678, -5))
            Line((-109.021632678, -5), (-111.126136458, -5))
        make_face()
    # profile 10 of 10: a face of its own
    with BuildSketch(Plane.XY.offset(17)):
        with Locations((-118, 0)):
            Circle(SKETCH9_R)
    extrude(amount=-BOSS_EXTRUDE5_DEPTH)

    # Sketch9<4> → Cut-Extrude12 (cut)
    # profile 1 of 3: a face of its own
    with BuildSketch(Plane.XY.offset(17).offset(CUT_EXTRUDE12_START)):
        with BuildLine():
            Line((-118, 5), (-114.167246421, 5))
            ThreePointArc((-114.167246421, 5), (-124.3, 0), (-114.167246421, -5))
            Line((-114.167246421, -5), (-118, -5))
            ThreePointArc((-118, -5), (-123, 0), (-118, 5))
        make_face()
    # profile 2 of 3: a face of its own
    with BuildSketch(Plane.XY.offset(17).offset(CUT_EXTRUDE12_START)):
        with BuildLine():
            ThreePointArc((-111.7, 0), (-112.350382865, 2.787799531), (-114.167246421, 5))
            Line((-114.167246421, 5), (-118, 5))
            ThreePointArc((-118, 5), (-123, 0), (-118, -5))
            Line((-118, -5), (-114.167246421, -5))
            ThreePointArc((-114.167246421, -5), (-112.350382865, -2.787799531), (-111.7, 0))
        make_face()
        with Locations((-118, 0)):
            Circle(SKETCH9_4_R, mode=Mode.SUBTRACT)
    # profile 3 of 3: a face of its own
    with BuildSketch(Plane.XY.offset(17).offset(CUT_EXTRUDE12_START)):
        with Locations((-118, 0)):
            Circle(SKETCH9_4_R)
    extrude(amount=CUT_EXTRUDE12_DEPTH, mode=Mode.SUBTRACT)

    # Sketch6<3> → Cut-Extrude13 (cut)
    with BuildSketch(Plane(origin=(0, 0, -17), x_dir=(-1, 0, 0), z_dir=(0, 0, -1)).offset(CUT_EXTRUDE13_START)):
        with Locations(Location((118, 0, 0), (0, 0, 180))):
            Circle(SKETCH6_3_R)
        with Locations(Location((110.5, -12.990381057, 0), (0, 0, 180))):
            Circle(SKETCH6_3_R_2, mode=Mode.SUBTRACT)
        with Locations(Location((110.5, 12.990381057, 0), (0, 0, 180))):
            Circle(SKETCH6_3_R_2, mode=Mode.SUBTRACT)
        with Locations(Location((133, 0, 0), (0, 0, 180))):
            Circle(SKETCH6_3_R_2, mode=Mode.SUBTRACT)
        with Locations(Location((118, 0, 0), (0, 0, 180))):
            Circle(SKETCH6_3_R_3, mode=Mode.SUBTRACT)
    extrude(amount=CUT_EXTRUDE13_DEPTH, mode=Mode.SUBTRACT)

    # Sketch11 → Cut-Extrude14 (cut, two sides: drawn at the far end of the back side and taken through both)
    with BuildSketch(Plane(origin=(0, 2, 0), x_dir=(1, 0, 0), z_dir=(0, 1, 0)).offset(-CUT_EXTRUDE14_DEPTH_BACK)):
        with Locations((99, 0)):
            Rectangle(SKETCH11_W, SKETCH11_H)
    extrude(amount=CUT_EXTRUDE14_DEPTH + CUT_EXTRUDE14_DEPTH_BACK, mode=Mode.SUBTRACT)

    # Sketch14 → Boss-Extrude6 (add)
    with BuildSketch(Plane.XY.offset(BOSS_EXTRUDE6_START)):
        with BuildLine():
            Line((67, 0), (75, 0))
            ThreePointArc((75, 0), (87.594408409, 30.405591591), (118, 43))
            Line((118, 43), (133, 43))
            Line((133, 43), (133, 51))
            Line((133, 51), (118, 51))
            ThreePointArc((118, 51), (81.937554159, 36.062445841), (67, 0))
        make_face()
    extrude(amount=BOSS_EXTRUDE6_DEPTH)

    # Sketch14<2> → Boss-Extrude7 (add)
    with BuildSketch(Plane.XY.offset(BOSS_EXTRUDE7_START)):
        with BuildLine():
            Line((67, 0), (75, 0))
            ThreePointArc((75, 0), (87.594408409, 30.405591591), (118, 43))
            Line((118, 43), (133, 43))
            Line((133, 43), (133, 51))
            Line((133, 51), (118, 51))
            ThreePointArc((118, 51), (81.937554159, 36.062445841), (67, 0))
        make_face()
    extrude(amount=BOSS_EXTRUDE7_DEPTH)


solid = part_2.part
